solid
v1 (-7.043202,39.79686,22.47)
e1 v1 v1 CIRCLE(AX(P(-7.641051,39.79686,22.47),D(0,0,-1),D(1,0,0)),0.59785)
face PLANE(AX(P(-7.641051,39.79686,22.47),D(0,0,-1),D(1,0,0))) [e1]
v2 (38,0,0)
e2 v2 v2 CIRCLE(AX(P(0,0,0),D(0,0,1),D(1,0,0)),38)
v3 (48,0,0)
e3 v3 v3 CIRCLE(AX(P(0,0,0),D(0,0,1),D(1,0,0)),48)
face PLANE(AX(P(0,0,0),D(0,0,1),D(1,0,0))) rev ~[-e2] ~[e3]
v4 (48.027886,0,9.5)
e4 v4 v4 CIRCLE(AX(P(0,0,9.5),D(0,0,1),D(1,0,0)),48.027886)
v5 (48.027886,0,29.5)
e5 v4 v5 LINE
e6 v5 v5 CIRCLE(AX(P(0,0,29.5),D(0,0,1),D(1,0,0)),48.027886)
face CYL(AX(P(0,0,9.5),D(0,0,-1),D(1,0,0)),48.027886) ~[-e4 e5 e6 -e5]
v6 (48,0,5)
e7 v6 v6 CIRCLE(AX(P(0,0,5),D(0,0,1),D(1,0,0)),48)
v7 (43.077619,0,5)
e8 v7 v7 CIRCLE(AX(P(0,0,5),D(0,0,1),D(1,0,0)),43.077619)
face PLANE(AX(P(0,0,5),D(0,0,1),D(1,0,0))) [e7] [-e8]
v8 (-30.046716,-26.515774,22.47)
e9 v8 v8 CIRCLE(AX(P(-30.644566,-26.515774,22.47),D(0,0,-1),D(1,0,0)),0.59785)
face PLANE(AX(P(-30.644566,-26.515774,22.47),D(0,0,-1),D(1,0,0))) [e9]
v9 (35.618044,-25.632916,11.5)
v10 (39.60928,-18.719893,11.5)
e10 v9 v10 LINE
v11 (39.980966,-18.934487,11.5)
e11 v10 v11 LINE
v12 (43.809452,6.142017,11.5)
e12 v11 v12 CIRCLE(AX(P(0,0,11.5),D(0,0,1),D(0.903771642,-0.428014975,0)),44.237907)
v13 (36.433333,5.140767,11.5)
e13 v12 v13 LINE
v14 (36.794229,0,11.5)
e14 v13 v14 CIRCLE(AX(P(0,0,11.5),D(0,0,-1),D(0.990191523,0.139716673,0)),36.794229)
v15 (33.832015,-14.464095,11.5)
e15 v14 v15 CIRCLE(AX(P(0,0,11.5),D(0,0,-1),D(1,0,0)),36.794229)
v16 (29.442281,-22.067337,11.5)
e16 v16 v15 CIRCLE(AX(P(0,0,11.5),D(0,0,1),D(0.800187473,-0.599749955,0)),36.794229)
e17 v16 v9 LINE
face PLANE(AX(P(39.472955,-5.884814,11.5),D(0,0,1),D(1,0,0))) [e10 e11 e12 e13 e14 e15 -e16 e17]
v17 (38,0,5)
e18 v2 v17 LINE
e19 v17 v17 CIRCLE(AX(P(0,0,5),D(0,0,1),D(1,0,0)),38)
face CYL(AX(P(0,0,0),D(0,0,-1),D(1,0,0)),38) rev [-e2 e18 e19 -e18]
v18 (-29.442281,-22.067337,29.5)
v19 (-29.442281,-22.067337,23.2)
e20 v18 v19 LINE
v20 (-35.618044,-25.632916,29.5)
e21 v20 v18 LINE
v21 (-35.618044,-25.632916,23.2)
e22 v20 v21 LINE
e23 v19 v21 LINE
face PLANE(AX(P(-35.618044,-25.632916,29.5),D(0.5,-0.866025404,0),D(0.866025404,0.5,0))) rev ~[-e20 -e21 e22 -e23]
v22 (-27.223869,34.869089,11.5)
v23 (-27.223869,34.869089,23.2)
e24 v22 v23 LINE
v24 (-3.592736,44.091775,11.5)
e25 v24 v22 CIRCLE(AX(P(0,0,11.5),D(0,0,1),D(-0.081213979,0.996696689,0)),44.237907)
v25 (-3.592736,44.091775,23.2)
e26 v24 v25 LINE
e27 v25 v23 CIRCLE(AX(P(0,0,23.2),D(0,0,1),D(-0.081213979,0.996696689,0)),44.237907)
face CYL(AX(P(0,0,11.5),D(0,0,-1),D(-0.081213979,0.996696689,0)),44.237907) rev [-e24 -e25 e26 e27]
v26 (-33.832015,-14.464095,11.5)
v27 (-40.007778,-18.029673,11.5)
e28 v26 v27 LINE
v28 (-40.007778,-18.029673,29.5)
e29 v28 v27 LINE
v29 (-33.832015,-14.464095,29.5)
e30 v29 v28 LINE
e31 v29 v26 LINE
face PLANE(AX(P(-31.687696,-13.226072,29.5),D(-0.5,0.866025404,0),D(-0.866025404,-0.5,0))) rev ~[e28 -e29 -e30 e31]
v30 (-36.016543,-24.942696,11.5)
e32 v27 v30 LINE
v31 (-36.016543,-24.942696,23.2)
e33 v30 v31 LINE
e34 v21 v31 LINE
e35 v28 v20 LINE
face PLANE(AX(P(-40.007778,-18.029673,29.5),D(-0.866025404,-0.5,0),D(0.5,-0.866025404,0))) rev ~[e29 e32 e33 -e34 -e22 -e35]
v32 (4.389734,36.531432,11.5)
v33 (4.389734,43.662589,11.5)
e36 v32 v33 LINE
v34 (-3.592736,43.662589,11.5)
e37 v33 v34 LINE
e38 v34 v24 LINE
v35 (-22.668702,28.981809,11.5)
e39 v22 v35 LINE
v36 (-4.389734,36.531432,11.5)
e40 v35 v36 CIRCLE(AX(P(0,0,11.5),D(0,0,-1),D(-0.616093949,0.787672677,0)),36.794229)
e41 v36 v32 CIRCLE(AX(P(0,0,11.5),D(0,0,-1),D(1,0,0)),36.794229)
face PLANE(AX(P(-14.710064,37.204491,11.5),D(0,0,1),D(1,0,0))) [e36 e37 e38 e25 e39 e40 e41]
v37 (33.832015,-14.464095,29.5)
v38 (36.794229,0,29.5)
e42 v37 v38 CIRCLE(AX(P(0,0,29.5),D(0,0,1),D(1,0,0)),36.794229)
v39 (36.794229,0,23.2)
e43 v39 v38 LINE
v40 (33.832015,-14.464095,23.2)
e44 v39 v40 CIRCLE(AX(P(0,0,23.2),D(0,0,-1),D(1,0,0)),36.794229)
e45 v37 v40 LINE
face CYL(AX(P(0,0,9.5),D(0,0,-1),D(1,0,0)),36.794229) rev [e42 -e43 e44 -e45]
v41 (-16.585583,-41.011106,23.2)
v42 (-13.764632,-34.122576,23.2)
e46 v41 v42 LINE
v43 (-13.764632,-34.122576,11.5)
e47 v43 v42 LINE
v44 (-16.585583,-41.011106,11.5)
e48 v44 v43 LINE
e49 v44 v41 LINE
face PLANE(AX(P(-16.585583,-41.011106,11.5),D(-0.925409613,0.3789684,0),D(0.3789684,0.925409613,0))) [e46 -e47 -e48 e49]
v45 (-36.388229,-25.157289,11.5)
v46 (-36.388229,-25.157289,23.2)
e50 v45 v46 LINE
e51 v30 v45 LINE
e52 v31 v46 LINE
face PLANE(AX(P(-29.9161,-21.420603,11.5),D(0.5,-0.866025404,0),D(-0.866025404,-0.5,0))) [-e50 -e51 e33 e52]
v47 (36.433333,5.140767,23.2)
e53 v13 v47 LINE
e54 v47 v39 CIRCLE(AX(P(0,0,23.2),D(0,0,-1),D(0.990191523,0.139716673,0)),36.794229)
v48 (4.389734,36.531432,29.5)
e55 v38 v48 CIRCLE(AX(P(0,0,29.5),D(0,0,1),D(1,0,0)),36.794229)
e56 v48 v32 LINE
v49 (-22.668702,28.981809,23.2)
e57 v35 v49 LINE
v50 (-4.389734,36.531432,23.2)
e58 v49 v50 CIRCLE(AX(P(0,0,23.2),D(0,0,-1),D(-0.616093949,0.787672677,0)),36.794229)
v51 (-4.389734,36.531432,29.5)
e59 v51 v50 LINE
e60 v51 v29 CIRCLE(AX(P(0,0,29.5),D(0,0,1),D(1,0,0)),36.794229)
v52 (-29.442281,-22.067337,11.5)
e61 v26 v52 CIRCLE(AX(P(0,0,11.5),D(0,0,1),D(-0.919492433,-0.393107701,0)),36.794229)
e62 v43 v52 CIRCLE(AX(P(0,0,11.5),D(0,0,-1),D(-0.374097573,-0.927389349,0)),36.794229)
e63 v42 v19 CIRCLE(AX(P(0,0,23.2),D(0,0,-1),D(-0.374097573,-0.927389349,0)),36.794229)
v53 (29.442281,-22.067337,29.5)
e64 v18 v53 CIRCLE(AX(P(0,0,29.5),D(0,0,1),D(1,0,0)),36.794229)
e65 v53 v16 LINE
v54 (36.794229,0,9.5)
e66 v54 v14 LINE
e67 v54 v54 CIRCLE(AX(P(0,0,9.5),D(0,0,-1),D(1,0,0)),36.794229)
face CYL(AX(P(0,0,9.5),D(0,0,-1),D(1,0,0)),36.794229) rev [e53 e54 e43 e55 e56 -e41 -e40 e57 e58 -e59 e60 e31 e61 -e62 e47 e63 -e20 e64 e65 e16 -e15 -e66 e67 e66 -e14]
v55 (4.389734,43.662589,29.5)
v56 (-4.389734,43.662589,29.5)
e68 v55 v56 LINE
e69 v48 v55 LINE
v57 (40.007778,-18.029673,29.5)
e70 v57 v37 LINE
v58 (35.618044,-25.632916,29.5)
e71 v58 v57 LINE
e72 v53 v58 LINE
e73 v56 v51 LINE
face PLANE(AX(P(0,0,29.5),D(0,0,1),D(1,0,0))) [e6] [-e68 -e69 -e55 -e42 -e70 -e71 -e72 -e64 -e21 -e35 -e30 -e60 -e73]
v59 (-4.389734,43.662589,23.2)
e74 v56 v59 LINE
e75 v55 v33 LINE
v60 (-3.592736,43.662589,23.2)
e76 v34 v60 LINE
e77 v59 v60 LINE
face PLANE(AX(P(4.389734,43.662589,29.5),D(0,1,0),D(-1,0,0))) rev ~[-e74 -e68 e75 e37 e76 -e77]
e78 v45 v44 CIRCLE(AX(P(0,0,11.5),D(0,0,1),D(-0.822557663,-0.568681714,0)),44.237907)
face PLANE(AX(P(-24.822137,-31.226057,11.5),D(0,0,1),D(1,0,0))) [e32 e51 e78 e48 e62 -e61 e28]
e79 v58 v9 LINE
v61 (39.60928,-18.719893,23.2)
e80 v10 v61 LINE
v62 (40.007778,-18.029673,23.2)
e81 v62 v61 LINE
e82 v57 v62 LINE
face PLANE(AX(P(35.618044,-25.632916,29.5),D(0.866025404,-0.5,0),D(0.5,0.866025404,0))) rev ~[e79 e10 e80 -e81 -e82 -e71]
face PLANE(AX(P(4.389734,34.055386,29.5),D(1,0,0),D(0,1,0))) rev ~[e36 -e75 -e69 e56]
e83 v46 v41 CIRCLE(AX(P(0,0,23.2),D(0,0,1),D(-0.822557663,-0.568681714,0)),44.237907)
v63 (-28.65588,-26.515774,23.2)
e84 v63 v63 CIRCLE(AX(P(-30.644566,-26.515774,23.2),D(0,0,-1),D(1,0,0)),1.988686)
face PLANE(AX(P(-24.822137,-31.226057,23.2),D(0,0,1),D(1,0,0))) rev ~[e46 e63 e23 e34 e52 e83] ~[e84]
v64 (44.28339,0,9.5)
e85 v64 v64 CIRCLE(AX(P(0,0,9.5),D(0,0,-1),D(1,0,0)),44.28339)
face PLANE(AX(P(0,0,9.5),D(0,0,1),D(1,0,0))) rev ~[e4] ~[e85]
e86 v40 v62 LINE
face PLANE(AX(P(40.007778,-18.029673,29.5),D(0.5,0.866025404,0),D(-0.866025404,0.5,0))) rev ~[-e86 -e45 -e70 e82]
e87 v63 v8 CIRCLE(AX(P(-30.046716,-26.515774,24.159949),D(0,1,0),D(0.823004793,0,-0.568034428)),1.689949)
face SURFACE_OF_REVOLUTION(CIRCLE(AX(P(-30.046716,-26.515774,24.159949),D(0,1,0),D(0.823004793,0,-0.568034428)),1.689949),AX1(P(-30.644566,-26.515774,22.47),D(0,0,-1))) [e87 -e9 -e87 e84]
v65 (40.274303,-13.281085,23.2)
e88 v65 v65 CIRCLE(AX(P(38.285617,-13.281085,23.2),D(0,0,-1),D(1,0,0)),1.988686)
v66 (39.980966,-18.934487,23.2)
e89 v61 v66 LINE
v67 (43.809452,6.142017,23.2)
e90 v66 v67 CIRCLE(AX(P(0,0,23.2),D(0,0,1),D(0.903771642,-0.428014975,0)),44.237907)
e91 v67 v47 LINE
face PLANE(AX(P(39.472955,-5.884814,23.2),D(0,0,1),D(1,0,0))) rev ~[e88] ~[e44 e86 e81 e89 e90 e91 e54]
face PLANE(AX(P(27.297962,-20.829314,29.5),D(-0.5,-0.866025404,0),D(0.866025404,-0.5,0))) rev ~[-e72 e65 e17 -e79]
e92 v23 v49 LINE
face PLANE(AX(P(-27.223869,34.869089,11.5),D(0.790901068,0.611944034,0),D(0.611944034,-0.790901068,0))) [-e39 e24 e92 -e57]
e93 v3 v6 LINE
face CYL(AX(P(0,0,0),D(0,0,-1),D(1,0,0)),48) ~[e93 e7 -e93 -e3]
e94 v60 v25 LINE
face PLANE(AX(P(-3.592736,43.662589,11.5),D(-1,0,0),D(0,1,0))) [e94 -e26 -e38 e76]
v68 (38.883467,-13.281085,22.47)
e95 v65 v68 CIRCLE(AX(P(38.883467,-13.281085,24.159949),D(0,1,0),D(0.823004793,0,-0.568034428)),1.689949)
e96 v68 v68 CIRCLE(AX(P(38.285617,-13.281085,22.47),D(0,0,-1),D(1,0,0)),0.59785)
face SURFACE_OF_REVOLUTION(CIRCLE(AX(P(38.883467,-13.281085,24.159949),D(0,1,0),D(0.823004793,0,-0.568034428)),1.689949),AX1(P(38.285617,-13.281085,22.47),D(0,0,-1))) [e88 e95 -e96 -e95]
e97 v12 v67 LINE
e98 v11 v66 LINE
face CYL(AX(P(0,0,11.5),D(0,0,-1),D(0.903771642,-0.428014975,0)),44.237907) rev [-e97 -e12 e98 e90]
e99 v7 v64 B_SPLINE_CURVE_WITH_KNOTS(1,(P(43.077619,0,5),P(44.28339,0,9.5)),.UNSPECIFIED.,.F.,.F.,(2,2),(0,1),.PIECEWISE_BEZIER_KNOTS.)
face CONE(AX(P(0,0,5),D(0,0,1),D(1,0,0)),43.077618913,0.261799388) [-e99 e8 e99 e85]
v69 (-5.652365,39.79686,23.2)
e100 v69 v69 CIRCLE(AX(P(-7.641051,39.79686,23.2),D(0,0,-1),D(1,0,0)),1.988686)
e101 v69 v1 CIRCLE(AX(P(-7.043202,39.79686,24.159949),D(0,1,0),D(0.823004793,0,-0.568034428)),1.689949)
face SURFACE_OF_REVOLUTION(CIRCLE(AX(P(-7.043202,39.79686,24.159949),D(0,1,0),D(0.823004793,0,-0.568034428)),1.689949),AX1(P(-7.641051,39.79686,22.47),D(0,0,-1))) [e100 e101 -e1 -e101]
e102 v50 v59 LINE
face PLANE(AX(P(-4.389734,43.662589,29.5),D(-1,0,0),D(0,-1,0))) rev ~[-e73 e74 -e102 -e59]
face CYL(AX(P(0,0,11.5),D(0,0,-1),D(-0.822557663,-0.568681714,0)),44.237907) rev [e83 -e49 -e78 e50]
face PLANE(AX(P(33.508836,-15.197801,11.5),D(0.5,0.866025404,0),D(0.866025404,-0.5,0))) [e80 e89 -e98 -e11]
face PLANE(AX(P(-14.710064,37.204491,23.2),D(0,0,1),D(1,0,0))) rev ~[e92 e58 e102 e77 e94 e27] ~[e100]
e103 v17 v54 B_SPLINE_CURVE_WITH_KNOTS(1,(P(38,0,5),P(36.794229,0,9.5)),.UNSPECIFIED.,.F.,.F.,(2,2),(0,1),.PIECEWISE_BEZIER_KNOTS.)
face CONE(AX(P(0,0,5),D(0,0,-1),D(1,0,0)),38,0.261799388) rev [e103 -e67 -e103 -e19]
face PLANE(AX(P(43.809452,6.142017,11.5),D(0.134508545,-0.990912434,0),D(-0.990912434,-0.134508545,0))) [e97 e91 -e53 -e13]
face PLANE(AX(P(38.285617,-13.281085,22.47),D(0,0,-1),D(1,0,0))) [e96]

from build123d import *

# Parameters (mm, degrees)
F0_R      = 48
F0_R_2    = 42
F0_R_3    = 38
F1_DEPTH  = 5
F2_R      = 43.0776189128
F2_R_2    = 38
F3_DEPTH  = 4.5
F3_TAPER  = -15
F4_R      = 48.0278860385
F4_R_2    = 44.2833902788
F4_R_3    = 36.7942286341
F5_DEPTH  = 20
F7_DEPTH  = 18
F9_DEPTH  = 11.7
F10_R     = 1.9886860781
F11_DEPTH = 0.73


# Not quite as in the source:
# - a fillet or chamfer that OpenCascade refuses, or shapes differently, is made with other operations: its cross-section is extruded or revolved along the edge and cut away or added


with BuildPart() as f1:
    # F0 (on Top) → F1 (new body)
    with BuildSketch(Plane.XY):
        Circle(F0_R)
        Circle(F0_R_2, mode=Mode.SUBTRACT)
        Circle(F0_R_2)
        Circle(F0_R_3, mode=Mode.SUBTRACT)
    extrude(amount=F1_DEPTH)

    # F2 (on face) → F3 (join)
    with BuildSketch(Plane.XY.offset(5)):
        Circle(F2_R)
        Circle(F2_R_2, mode=Mode.SUBTRACT)
    extrude(amount=F3_DEPTH, taper=F3_TAPER)

    # F4 (on face) → F5 (join)
    with BuildSketch(Plane.XY.offset(9.5)):
        Circle(F4_R)
        Circle(F4_R_2, mode=Mode.SUBTRACT)
        Circle(F4_R_2)
        Circle(F4_R_3, mode=Mode.SUBTRACT)
    extrude(amount=F5_DEPTH)

    # F6 (on face) → F7 (cut)
    with BuildSketch(Plane.XY.offset(29.5)):
        Polygon((4.3897340074, 43.6625890434), (0, 43.6625890434), (-4.3897340074, 43.6625890434), (-4.3897340074, 34.0553857386), (0, 34.0553857386), (4.3897340074, 34.0553857386), align=None)
        Polygon((-35.6180443029, -25.632915688), (-27.2979621816, -20.8293140356), (-29.4928291853, -17.0276928693), (-31.687696189, -13.226071703), (-40.0077783103, -18.0296733554), (-37.8129113066, -21.8312945217), align=None)
        Polygon((40.0077783103, -18.0296733554), (31.687696189, -13.226071703), (29.4928291853, -17.0276928693), (27.2979621816, -20.8293140356), (35.6180443029, -25.632915688), (37.8129113066, -21.8312945217), align=None)
    extrude(amount=-F7_DEPTH, mode=Mode.SUBTRACT)

    # F8 (on face) → F9 (cut)
    with BuildSketch(Plane.XY.offset(11.5)):
        with BuildLine():
            ThreePointArc((-22.6687016251, 28.98180856), (-14.0459580236, 34.0077391776), (-4.3897340074, 36.5314316188))
            Line((-4.3897340074, 36.5314316188), (-4.3897340074, 43.6625890434))
            Line((-4.3897340074, 43.6625890434), (-3.592736461, 43.6625890434))
            Line((-3.592736461, 43.6625890434), (-3.592736461, 44.0917754576))
            ThreePointArc((-3.592736461, 44.0917754576), (-16.0835403712, 41.210582954), (-27.2238685762, 34.869089435))
            Line((-27.2238685762, 34.869089435), (-22.6687016251, 28.98180856))
        make_face()
        with BuildLine():
            ThreePointArc((36.4333332731, 5.1407671981), (36.7038939019, 2.5767097647), (36.7942286341, 0))
            ThreePointArc((36.7942286341, 0), (35.9635026363, -7.7744285261), (33.5088362695, -15.1978009146))
            Line((33.5088362695, -15.1978009146), (39.9809658747, -18.9344866844))
            ThreePointArc((39.9809658747, -18.9344866844), (43.7311819285, -6.6765369327), (43.8094515456, 6.1420170588))
            Line((43.8094515456, 6.1420170588), (36.4333332731, 5.1407671981))
        make_face()
        with BuildLine():
            Line((-16.5855829694, -41.0111064938), (-13.764631648, -34.1225757581))
            ThreePointArc((-13.764631648, -34.1225757581), (-22.7450346913, -28.9219407659), (-29.9160998084, -21.4206030033))
            Line((-29.9160998084, -21.4206030033), (-36.3882294137, -25.1572887731))
            ThreePointArc((-36.3882294137, -25.1572887731), (-27.6476415573, -34.5340460213), (-16.5855829694, -41.0111064938))
        make_face()
    extrude(amount=F9_DEPTH, mode=Mode.SUBTRACT)

    # F10 (on face) → F11 (join)
    with BuildSketch(Plane(origin=(0, 0, 23.2), x_dir=(1, 0, 0), z_dir=(0, 0, -1))):
        with Locations((-30.6445658207, 26.5157744288)):
            Circle(F10_R)
        with Locations((38.2856171667, 13.2810852742)):
            Circle(F10_R)
        with Locations((-7.6410513461, -39.7968597031)):
            Circle(F10_R)
    extrude(amount=F11_DEPTH)

    # F12: fillet of radius 1.6899494937 on 3 edges, made by hand

    # F12_s1 → F12_t2 (revolve, cut)
    with BuildSketch(Plane.XZ.offset(26.5157744288)):
        with BuildLine():
            ThreePointArc((-28.6558797426, 23.2), (-29.2613300231, 22.6635879979), (-30.0467162753, 22.47))
            Line((-30.0467162753, 22.47), (-28.6558797426, 22.47))
            Line((-28.6558797426, 22.47), (-28.6558797426, 23.2))
        make_face()
    revolve(axis=Axis((-30.6445658207, -26.5157744288, 22.47), (0, 0, -1)), mode=Mode.SUBTRACT)

    # F12_s3 → F12_t4 (revolve, cut)
    with BuildSketch(Plane.XZ.offset(13.2810852742)):
        with BuildLine():
            ThreePointArc((40.2743032449, 23.2), (39.6688529644, 22.6635879979), (38.8834667121, 22.47))
            Line((38.8834667121, 22.47), (40.2743032449, 22.47))
            Line((40.2743032449, 22.47), (40.2743032449, 23.2))
        make_face()
    revolve(axis=Axis((38.2856171667, -13.2810852742, 22.47), (0, 0, -1)), mode=Mode.SUBTRACT)

    # F12_s5 → F12_t6 (revolve, cut)
    with BuildSketch(Plane.XZ.offset(-39.7968597031)):
        with BuildLine():
            ThreePointArc((-5.6523652679, 23.2), (-6.2578155484, 22.6635879979), (-7.0432018006, 22.47))
            Line((-7.0432018006, 22.47), (-5.6523652679, 22.47))
            Line((-5.6523652679, 22.47), (-5.6523652679, 23.2))
        make_face()
    revolve(axis=Axis((-7.6410513461, 39.7968597031, 22.47), (0, 0, -1)), mode=Mode.SUBTRACT)


solid = f1.part
